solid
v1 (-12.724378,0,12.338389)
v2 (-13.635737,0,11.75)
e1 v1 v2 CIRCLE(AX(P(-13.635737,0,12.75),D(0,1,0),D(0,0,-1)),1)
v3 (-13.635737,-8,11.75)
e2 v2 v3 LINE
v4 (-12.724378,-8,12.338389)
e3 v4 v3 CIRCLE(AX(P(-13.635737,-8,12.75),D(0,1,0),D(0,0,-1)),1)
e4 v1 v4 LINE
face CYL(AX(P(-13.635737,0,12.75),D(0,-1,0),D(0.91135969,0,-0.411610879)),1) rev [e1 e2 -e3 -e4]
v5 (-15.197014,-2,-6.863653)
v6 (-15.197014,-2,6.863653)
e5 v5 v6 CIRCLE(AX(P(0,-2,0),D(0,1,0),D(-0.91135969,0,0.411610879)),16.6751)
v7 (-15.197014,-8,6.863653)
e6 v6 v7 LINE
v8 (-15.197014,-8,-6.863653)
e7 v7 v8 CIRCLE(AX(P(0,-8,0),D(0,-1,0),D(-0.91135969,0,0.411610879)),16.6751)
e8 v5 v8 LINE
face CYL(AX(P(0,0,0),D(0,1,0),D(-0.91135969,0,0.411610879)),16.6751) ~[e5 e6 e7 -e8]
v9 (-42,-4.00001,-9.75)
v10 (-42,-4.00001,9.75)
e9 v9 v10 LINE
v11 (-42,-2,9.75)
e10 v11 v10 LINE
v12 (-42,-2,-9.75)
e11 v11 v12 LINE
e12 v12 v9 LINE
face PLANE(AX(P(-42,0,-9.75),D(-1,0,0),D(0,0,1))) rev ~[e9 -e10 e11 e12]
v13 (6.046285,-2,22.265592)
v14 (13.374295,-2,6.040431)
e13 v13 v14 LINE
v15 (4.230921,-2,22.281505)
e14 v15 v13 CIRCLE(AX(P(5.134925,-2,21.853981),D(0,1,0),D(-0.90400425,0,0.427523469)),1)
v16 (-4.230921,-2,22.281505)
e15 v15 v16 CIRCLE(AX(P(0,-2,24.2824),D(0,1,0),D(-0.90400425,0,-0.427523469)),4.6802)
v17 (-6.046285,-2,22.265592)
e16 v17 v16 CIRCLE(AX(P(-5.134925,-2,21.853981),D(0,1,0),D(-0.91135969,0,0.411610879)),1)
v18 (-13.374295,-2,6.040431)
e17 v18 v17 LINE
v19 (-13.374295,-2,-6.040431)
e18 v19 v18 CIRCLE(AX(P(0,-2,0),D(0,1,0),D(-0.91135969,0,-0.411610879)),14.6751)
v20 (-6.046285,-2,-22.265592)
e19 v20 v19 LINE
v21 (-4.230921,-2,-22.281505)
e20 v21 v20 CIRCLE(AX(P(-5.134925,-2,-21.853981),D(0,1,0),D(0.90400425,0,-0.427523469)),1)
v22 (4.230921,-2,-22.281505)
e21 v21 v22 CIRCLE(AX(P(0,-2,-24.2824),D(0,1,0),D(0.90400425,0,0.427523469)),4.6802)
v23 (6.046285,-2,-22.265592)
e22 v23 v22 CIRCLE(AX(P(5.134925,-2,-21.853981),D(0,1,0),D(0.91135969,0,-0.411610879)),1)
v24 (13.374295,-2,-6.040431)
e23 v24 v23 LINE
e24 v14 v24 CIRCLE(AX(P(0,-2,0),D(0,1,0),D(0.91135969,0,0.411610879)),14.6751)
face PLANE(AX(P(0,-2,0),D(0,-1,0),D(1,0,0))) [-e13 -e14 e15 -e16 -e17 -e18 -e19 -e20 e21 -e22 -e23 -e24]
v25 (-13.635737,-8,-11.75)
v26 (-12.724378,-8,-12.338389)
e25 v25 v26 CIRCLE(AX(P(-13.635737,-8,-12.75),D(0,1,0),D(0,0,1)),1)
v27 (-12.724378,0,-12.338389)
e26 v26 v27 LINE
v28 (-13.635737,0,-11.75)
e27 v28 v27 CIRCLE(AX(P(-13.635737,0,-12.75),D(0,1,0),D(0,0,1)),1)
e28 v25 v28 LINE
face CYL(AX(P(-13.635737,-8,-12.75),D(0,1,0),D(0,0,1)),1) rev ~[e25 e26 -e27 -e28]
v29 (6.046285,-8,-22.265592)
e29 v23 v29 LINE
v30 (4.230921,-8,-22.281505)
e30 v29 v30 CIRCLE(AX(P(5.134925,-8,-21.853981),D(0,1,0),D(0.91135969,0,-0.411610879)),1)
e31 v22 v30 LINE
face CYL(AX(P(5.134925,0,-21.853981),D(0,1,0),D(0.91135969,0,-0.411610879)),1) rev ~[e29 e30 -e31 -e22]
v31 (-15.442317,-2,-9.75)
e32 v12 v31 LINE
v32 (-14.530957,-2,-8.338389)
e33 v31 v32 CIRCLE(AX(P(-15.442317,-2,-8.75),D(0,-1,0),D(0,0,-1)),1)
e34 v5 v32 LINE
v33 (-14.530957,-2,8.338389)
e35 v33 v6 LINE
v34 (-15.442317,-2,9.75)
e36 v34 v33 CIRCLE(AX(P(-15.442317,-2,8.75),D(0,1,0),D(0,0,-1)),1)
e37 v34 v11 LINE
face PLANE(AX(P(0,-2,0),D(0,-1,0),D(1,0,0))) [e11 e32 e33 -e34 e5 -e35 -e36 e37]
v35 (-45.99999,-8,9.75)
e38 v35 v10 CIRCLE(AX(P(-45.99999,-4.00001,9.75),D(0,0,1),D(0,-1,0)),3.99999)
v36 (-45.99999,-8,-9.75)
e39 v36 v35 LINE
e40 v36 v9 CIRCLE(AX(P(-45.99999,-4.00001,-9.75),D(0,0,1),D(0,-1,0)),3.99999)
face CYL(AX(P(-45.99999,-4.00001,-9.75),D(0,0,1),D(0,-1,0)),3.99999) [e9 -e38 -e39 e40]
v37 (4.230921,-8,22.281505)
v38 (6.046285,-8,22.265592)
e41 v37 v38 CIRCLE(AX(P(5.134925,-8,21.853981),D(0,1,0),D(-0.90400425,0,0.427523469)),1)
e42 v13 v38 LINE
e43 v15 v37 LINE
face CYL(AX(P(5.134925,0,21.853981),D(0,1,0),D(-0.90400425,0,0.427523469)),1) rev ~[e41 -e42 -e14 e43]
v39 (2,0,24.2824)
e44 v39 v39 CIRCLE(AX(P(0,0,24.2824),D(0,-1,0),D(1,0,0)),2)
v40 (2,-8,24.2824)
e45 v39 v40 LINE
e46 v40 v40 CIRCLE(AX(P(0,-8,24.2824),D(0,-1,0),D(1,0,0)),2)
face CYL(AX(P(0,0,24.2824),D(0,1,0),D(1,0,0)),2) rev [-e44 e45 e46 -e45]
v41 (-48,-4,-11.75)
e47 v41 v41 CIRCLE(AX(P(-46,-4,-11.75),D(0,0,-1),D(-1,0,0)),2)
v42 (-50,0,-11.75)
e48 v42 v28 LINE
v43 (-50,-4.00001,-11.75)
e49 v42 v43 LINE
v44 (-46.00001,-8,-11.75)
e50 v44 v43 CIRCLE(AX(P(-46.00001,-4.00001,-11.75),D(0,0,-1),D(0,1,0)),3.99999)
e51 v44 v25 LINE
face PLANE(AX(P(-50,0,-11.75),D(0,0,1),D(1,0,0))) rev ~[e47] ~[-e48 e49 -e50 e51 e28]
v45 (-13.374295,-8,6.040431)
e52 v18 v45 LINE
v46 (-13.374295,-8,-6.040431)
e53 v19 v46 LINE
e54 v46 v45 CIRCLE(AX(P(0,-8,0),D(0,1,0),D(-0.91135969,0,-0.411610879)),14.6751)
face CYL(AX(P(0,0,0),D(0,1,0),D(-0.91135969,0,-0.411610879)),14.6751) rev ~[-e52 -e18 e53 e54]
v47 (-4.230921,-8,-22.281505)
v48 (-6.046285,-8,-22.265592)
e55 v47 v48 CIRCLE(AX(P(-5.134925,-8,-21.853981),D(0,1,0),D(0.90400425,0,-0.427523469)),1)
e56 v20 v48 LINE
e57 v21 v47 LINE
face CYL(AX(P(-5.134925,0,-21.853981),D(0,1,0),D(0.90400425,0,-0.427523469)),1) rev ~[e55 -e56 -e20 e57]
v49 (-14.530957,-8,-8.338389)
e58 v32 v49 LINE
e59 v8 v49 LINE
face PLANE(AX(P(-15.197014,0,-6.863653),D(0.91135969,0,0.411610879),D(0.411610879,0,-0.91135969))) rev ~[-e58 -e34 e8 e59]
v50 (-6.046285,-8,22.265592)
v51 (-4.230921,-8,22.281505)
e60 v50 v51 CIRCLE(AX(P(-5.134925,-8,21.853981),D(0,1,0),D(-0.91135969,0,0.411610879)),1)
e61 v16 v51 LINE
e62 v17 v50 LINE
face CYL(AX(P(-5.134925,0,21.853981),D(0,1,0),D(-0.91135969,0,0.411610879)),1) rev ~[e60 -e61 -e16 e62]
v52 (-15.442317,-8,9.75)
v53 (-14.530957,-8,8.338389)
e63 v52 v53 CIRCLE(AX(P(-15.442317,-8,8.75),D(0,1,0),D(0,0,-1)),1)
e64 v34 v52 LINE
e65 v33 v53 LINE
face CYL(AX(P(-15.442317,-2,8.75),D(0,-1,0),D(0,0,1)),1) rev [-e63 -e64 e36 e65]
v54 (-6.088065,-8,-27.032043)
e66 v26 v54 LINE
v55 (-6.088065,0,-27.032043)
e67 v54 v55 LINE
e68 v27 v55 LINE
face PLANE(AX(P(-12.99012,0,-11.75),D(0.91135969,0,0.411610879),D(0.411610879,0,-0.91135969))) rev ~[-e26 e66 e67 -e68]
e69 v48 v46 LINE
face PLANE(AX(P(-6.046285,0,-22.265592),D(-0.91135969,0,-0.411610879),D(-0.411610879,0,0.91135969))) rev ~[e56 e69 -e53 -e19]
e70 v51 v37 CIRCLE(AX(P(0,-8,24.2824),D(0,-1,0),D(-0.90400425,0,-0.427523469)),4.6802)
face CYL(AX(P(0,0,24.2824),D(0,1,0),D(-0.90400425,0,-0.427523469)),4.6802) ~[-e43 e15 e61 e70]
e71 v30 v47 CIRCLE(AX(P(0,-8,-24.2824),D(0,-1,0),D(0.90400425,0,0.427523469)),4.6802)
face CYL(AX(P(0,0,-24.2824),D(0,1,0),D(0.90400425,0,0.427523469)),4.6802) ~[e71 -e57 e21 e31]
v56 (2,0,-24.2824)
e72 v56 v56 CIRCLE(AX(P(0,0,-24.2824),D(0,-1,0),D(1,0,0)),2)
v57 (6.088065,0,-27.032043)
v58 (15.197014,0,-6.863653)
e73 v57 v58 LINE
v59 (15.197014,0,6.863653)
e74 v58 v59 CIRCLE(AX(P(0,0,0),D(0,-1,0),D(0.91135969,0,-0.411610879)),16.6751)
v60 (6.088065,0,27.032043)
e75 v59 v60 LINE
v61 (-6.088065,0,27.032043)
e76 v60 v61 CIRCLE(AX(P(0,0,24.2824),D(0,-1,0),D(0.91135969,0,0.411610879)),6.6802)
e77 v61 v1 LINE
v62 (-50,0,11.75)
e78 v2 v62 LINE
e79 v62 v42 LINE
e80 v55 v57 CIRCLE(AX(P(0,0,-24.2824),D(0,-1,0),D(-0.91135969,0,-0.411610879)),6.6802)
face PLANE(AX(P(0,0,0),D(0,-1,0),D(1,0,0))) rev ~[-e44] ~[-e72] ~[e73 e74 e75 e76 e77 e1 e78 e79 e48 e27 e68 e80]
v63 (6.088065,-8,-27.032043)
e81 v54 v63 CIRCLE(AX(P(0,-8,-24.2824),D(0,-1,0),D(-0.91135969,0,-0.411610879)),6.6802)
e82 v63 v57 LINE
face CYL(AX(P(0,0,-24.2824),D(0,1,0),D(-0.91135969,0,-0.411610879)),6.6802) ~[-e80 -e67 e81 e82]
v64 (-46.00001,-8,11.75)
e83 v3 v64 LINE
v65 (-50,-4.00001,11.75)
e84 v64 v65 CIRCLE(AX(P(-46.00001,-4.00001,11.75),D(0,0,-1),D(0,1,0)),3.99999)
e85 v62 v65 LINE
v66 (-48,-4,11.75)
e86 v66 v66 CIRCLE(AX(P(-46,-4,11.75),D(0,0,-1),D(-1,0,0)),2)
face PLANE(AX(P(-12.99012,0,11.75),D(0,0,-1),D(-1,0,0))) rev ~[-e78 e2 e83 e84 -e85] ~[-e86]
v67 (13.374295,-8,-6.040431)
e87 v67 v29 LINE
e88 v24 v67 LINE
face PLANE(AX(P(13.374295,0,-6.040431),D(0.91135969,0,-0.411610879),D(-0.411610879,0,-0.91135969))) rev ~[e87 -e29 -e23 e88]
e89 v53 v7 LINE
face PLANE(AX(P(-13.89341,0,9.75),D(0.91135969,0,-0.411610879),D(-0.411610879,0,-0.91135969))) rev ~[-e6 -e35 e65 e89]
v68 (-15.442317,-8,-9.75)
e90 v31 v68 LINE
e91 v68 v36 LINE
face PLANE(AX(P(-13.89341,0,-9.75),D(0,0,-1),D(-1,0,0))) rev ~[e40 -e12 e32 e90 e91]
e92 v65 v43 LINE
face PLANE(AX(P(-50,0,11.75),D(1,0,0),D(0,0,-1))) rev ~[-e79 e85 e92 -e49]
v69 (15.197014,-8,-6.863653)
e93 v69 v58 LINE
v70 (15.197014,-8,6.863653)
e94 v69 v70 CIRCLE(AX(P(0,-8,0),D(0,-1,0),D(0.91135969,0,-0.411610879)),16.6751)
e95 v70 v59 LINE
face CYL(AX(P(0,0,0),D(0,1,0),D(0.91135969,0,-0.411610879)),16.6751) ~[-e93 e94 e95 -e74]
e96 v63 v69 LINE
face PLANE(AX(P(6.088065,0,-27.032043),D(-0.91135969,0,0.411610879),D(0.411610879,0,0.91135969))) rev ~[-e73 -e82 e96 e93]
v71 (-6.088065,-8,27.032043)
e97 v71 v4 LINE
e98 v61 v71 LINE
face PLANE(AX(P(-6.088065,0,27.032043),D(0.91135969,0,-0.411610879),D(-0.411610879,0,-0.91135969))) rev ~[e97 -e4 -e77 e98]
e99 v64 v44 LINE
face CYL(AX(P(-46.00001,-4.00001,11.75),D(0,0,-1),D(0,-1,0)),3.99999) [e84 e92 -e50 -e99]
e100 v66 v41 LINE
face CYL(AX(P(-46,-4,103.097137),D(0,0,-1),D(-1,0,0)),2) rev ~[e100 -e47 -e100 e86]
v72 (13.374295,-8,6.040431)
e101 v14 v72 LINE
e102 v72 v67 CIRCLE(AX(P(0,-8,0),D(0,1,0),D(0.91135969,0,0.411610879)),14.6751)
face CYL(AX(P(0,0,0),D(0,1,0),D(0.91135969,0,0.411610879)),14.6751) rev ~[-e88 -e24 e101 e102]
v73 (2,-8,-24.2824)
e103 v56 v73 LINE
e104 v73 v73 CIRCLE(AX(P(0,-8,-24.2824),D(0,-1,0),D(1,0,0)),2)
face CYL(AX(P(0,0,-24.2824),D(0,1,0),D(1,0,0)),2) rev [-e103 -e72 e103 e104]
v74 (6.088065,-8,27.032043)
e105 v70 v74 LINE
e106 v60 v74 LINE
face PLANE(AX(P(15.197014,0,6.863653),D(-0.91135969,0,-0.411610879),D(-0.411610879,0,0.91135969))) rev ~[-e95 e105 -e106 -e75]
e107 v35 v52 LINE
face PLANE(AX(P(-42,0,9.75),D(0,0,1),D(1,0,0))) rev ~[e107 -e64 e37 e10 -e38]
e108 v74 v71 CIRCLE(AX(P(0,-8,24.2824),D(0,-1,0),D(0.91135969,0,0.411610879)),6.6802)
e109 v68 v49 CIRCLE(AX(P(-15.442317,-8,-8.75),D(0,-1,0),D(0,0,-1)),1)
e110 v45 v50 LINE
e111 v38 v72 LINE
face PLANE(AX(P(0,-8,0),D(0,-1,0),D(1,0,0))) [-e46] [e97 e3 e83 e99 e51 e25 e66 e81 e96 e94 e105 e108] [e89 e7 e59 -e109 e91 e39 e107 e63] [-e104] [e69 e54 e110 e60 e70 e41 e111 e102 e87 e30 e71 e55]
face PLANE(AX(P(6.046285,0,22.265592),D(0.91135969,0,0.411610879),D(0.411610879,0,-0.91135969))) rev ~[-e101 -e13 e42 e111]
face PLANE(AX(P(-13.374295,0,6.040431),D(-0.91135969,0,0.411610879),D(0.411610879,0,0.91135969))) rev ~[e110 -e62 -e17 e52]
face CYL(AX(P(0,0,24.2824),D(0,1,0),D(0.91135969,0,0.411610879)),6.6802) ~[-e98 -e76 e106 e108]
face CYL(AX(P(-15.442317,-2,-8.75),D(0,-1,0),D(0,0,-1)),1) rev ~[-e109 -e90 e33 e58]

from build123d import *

# Parameters (mm, degrees)
F0_R     = 2
F1_DEPTH = 8
F2_DEPTH = 2
F3_R     = 1
F5_D     = 4
F6_R     = 3.99999


# Not quite as in the source:
# - a fillet or chamfer is up to 0.001 mm smaller than in the source, because OpenCascade refuses the exact size
# - a feature names something its author has since deleted; it is built from what else it names


with BuildPart() as f1:
    # F0 (on Front) → F1 (new body)
    with BuildSketch(Plane.XZ):
        with BuildLine():
            Line((15.1970139668, 6.8636525628), (6.0880650012, 27.0320429916))
            ThreePointArc((6.0880650012, 27.0320429916), (0, 30.9626), (-6.0880650012, 27.0320429916))
            Line((-6.0880650012, 27.0320429916), (-12.9901204821, 11.75))
            Line((-12.9901204821, 11.75), (-13.8934101123, 9.75))
            Line((-13.8934101123, 9.75), (-15.1970139668, 6.8636525628))
            ThreePointArc((-15.1970139668, 6.8636525628), (-16.6751, 0), (-15.1970139668, -6.8636525628))
            Line((-15.1970139668, -6.8636525628), (-13.8934101123, -9.75))
            Line((-13.8934101123, -9.75), (-12.9901204821, -11.75))
            Line((-12.9901204821, -11.75), (-6.0880650012, -27.0320429916))
            ThreePointArc((-6.0880650012, -27.0320429916), (0, -30.9626), (6.0880650012, -27.0320429916))
            Line((6.0880650012, -27.0320429916), (15.1970139668, -6.8636525628))
            ThreePointArc((15.1970139668, -6.8636525628), (16.6751, 0), (15.1970139668, 6.8636525628))
        make_face()
        with Locations((0, -24.2824)):
            Circle(F0_R, mode=Mode.SUBTRACT)
        with BuildLine():
            Line((-13.3742945868, 6.0404308054), (-6.0462846285, 22.2655920687))
            ThreePointArc((-6.0462846285, 22.2655920687), (-5.1436901116, 22.8539427752), (-4.2309206889, 22.2815046593))
            ThreePointArc((-4.2309206889, 22.2815046593), (0, 19.6022), (4.2309206889, 22.2815046593))
            ThreePointArc((4.2309206889, 22.2815046593), (5.1436901116, 22.8539427752), (6.0462846285, 22.2655920687))
            Line((6.0462846285, 22.2655920687), (13.3742945868, 6.0404308054))
            ThreePointArc((13.3742945868, 6.0404308054), (14.6751, 0), (13.3742945868, -6.0404308054))
            Line((13.3742945868, -6.0404308054), (6.0462846285, -22.2655920687))
            ThreePointArc((6.0462846285, -22.2655920687), (5.1436901116, -22.8539427752), (4.2309206889, -22.2815046593))
            ThreePointArc((4.2309206889, -22.2815046593), (0, -19.6022), (-4.2309206889, -22.2815046593))
            ThreePointArc((-4.2309206889, -22.2815046593), (-5.1436901116, -22.8539427752), (-6.0462846285, -22.2655920687))
            Line((-6.0462846285, -22.2655920687), (-13.3742945868, -6.0404308054))
            ThreePointArc((-13.3742945868, -6.0404308054), (-14.6751, 0), (-13.3742945868, 6.0404308054))
        make_face(mode=Mode.SUBTRACT)
        with Locations((0, 24.2824)):
            Circle(F0_R, mode=Mode.SUBTRACT)
        Polygon((-13.8934101123, 9.75), (-12.9901204821, 11.75), (-50, 11.75), (-50, -11.75), (-12.9901204821, -11.75), (-13.8934101123, -9.75), (-42, -9.75), (-42, 9.75), align=None)
    extrude(amount=F1_DEPTH)

    # F0 (on Front) → F2 (join)
    with BuildSketch(Plane.XZ):
        with BuildLine():
            Line((15.1970139668, 6.8636525628), (6.0880650012, 27.0320429916))
            ThreePointArc((6.0880650012, 27.0320429916), (0, 30.9626), (-6.0880650012, 27.0320429916))
            Line((-6.0880650012, 27.0320429916), (-12.9901204821, 11.75))
            Line((-12.9901204821, 11.75), (-13.8934101123, 9.75))
            Line((-13.8934101123, 9.75), (-15.1970139668, 6.8636525628))
            ThreePointArc((-15.1970139668, 6.8636525628), (-16.6751, 0), (-15.1970139668, -6.8636525628))
            Line((-15.1970139668, -6.8636525628), (-13.8934101123, -9.75))
            Line((-13.8934101123, -9.75), (-12.9901204821, -11.75))
            Line((-12.9901204821, -11.75), (-6.0880650012, -27.0320429916))
            ThreePointArc((-6.0880650012, -27.0320429916), (0, -30.9626), (6.0880650012, -27.0320429916))
            Line((6.0880650012, -27.0320429916), (15.1970139668, -6.8636525628))
            ThreePointArc((15.1970139668, -6.8636525628), (16.6751, 0), (15.1970139668, 6.8636525628))
        make_face()
        with Locations((0, -24.2824)):
            Circle(F0_R, mode=Mode.SUBTRACT)
        with BuildLine():
            Line((-13.3742945868, 6.0404308054), (-6.0462846285, 22.2655920687))
            ThreePointArc((-6.0462846285, 22.2655920687), (-5.1436901116, 22.8539427752), (-4.2309206889, 22.2815046593))
            ThreePointArc((-4.2309206889, 22.2815046593), (0, 19.6022), (4.2309206889, 22.2815046593))
            ThreePointArc((4.2309206889, 22.2815046593), (5.1436901116, 22.8539427752), (6.0462846285, 22.2655920687))
            Line((6.0462846285, 22.2655920687), (13.3742945868, 6.0404308054))
            ThreePointArc((13.3742945868, 6.0404308054), (14.6751, 0), (13.3742945868, -6.0404308054))
            Line((13.3742945868, -6.0404308054), (6.0462846285, -22.2655920687))
            ThreePointArc((6.0462846285, -22.2655920687), (5.1436901116, -22.8539427752), (4.2309206889, -22.2815046593))
            ThreePointArc((4.2309206889, -22.2815046593), (0, -19.6022), (-4.2309206889, -22.2815046593))
            ThreePointArc((-4.2309206889, -22.2815046593), (-5.1436901116, -22.8539427752), (-6.0462846285, -22.2655920687))
            Line((-6.0462846285, -22.2655920687), (-13.3742945868, -6.0404308054))
            ThreePointArc((-13.3742945868, -6.0404308054), (-14.6751, 0), (-13.3742945868, 6.0404308054))
        make_face(mode=Mode.SUBTRACT)
        with Locations((0, 24.2824)):
            Circle(F0_R, mode=Mode.SUBTRACT)
        with BuildLine():
            ThreePointArc((-4.2309206889, 22.2815046593), (-5.1436901116, 22.8539427752), (-6.0462846285, 22.2655920687))
            Line((-6.0462846285, 22.2655920687), (-13.3742945868, 6.0404308054))
            ThreePointArc((-13.3742945868, 6.0404308054), (-14.6751, 0), (-13.3742945868, -6.0404308054))
            Line((-13.3742945868, -6.0404308054), (-6.0462846285, -22.2655920687))
            ThreePointArc((-6.0462846285, -22.2655920687), (-5.1436901116, -22.8539427752), (-4.2309206889, -22.2815046593))
            ThreePointArc((-4.2309206889, -22.2815046593), (0, -19.6022), (4.2309206889, -22.2815046593))
            ThreePointArc((4.2309206889, -22.2815046593), (5.1436901116, -22.8539427752), (6.0462846285, -22.2655920687))
            Line((6.0462846285, -22.2655920687), (13.3742945868, -6.0404308054))
            ThreePointArc((13.3742945868, -6.0404308054), (14.6751, 0), (13.3742945868, 6.0404308054))
            Line((13.3742945868, 6.0404308054), (6.0462846285, 22.2655920687))
            ThreePointArc((6.0462846285, 22.2655920687), (5.1436901116, 22.8539427752), (4.2309206889, 22.2815046593))
            ThreePointArc((4.2309206889, 22.2815046593), (0, 19.6022), (-4.2309206889, 22.2815046593))
        make_face()
        with BuildLine():
            Line((-15.1970139668, 6.8636525628), (-13.8934101123, 9.75))
            Line((-13.8934101123, 9.75), (-42, 9.75))
            Line((-42, 9.75), (-42, -9.75))
            Line((-42, -9.75), (-13.8934101123, -9.75))
            Line((-13.8934101123, -9.75), (-15.1970139668, -6.8636525628))
            ThreePointArc((-15.1970139668, -6.8636525628), (-16.6751, 0), (-15.1970139668, 6.8636525628))
        make_face()
    extrude(amount=F2_DEPTH)

    # F3
    f3_edges = [f1.edges().sort_by_distance(p)[0] for p in [
        (-13.89341, -5, -9.75),
        (-12.99012, -4, -11.75),
        (-13.89341, -5, 9.75),
        (-12.99012, -4, 11.75),
    ]]
    fillet(f3_edges, radius=F3_R)

    # F5 (through all)
    with Locations(Plane.XY.offset(11.75)):
        with Locations((-46, -4)):
            Hole(F5_D / 2)

    # F6 (radius 4 in the source; OpenCascade refuses exactly that, so slightly less here)
    f6_edges = [f1.edges().sort_by_distance(p)[0] for p in [
        (-50, -8, 0),
        (-42, -8, 0),
    ]]
    fillet(f6_edges, radius=F6_R)


solid = f1.part
